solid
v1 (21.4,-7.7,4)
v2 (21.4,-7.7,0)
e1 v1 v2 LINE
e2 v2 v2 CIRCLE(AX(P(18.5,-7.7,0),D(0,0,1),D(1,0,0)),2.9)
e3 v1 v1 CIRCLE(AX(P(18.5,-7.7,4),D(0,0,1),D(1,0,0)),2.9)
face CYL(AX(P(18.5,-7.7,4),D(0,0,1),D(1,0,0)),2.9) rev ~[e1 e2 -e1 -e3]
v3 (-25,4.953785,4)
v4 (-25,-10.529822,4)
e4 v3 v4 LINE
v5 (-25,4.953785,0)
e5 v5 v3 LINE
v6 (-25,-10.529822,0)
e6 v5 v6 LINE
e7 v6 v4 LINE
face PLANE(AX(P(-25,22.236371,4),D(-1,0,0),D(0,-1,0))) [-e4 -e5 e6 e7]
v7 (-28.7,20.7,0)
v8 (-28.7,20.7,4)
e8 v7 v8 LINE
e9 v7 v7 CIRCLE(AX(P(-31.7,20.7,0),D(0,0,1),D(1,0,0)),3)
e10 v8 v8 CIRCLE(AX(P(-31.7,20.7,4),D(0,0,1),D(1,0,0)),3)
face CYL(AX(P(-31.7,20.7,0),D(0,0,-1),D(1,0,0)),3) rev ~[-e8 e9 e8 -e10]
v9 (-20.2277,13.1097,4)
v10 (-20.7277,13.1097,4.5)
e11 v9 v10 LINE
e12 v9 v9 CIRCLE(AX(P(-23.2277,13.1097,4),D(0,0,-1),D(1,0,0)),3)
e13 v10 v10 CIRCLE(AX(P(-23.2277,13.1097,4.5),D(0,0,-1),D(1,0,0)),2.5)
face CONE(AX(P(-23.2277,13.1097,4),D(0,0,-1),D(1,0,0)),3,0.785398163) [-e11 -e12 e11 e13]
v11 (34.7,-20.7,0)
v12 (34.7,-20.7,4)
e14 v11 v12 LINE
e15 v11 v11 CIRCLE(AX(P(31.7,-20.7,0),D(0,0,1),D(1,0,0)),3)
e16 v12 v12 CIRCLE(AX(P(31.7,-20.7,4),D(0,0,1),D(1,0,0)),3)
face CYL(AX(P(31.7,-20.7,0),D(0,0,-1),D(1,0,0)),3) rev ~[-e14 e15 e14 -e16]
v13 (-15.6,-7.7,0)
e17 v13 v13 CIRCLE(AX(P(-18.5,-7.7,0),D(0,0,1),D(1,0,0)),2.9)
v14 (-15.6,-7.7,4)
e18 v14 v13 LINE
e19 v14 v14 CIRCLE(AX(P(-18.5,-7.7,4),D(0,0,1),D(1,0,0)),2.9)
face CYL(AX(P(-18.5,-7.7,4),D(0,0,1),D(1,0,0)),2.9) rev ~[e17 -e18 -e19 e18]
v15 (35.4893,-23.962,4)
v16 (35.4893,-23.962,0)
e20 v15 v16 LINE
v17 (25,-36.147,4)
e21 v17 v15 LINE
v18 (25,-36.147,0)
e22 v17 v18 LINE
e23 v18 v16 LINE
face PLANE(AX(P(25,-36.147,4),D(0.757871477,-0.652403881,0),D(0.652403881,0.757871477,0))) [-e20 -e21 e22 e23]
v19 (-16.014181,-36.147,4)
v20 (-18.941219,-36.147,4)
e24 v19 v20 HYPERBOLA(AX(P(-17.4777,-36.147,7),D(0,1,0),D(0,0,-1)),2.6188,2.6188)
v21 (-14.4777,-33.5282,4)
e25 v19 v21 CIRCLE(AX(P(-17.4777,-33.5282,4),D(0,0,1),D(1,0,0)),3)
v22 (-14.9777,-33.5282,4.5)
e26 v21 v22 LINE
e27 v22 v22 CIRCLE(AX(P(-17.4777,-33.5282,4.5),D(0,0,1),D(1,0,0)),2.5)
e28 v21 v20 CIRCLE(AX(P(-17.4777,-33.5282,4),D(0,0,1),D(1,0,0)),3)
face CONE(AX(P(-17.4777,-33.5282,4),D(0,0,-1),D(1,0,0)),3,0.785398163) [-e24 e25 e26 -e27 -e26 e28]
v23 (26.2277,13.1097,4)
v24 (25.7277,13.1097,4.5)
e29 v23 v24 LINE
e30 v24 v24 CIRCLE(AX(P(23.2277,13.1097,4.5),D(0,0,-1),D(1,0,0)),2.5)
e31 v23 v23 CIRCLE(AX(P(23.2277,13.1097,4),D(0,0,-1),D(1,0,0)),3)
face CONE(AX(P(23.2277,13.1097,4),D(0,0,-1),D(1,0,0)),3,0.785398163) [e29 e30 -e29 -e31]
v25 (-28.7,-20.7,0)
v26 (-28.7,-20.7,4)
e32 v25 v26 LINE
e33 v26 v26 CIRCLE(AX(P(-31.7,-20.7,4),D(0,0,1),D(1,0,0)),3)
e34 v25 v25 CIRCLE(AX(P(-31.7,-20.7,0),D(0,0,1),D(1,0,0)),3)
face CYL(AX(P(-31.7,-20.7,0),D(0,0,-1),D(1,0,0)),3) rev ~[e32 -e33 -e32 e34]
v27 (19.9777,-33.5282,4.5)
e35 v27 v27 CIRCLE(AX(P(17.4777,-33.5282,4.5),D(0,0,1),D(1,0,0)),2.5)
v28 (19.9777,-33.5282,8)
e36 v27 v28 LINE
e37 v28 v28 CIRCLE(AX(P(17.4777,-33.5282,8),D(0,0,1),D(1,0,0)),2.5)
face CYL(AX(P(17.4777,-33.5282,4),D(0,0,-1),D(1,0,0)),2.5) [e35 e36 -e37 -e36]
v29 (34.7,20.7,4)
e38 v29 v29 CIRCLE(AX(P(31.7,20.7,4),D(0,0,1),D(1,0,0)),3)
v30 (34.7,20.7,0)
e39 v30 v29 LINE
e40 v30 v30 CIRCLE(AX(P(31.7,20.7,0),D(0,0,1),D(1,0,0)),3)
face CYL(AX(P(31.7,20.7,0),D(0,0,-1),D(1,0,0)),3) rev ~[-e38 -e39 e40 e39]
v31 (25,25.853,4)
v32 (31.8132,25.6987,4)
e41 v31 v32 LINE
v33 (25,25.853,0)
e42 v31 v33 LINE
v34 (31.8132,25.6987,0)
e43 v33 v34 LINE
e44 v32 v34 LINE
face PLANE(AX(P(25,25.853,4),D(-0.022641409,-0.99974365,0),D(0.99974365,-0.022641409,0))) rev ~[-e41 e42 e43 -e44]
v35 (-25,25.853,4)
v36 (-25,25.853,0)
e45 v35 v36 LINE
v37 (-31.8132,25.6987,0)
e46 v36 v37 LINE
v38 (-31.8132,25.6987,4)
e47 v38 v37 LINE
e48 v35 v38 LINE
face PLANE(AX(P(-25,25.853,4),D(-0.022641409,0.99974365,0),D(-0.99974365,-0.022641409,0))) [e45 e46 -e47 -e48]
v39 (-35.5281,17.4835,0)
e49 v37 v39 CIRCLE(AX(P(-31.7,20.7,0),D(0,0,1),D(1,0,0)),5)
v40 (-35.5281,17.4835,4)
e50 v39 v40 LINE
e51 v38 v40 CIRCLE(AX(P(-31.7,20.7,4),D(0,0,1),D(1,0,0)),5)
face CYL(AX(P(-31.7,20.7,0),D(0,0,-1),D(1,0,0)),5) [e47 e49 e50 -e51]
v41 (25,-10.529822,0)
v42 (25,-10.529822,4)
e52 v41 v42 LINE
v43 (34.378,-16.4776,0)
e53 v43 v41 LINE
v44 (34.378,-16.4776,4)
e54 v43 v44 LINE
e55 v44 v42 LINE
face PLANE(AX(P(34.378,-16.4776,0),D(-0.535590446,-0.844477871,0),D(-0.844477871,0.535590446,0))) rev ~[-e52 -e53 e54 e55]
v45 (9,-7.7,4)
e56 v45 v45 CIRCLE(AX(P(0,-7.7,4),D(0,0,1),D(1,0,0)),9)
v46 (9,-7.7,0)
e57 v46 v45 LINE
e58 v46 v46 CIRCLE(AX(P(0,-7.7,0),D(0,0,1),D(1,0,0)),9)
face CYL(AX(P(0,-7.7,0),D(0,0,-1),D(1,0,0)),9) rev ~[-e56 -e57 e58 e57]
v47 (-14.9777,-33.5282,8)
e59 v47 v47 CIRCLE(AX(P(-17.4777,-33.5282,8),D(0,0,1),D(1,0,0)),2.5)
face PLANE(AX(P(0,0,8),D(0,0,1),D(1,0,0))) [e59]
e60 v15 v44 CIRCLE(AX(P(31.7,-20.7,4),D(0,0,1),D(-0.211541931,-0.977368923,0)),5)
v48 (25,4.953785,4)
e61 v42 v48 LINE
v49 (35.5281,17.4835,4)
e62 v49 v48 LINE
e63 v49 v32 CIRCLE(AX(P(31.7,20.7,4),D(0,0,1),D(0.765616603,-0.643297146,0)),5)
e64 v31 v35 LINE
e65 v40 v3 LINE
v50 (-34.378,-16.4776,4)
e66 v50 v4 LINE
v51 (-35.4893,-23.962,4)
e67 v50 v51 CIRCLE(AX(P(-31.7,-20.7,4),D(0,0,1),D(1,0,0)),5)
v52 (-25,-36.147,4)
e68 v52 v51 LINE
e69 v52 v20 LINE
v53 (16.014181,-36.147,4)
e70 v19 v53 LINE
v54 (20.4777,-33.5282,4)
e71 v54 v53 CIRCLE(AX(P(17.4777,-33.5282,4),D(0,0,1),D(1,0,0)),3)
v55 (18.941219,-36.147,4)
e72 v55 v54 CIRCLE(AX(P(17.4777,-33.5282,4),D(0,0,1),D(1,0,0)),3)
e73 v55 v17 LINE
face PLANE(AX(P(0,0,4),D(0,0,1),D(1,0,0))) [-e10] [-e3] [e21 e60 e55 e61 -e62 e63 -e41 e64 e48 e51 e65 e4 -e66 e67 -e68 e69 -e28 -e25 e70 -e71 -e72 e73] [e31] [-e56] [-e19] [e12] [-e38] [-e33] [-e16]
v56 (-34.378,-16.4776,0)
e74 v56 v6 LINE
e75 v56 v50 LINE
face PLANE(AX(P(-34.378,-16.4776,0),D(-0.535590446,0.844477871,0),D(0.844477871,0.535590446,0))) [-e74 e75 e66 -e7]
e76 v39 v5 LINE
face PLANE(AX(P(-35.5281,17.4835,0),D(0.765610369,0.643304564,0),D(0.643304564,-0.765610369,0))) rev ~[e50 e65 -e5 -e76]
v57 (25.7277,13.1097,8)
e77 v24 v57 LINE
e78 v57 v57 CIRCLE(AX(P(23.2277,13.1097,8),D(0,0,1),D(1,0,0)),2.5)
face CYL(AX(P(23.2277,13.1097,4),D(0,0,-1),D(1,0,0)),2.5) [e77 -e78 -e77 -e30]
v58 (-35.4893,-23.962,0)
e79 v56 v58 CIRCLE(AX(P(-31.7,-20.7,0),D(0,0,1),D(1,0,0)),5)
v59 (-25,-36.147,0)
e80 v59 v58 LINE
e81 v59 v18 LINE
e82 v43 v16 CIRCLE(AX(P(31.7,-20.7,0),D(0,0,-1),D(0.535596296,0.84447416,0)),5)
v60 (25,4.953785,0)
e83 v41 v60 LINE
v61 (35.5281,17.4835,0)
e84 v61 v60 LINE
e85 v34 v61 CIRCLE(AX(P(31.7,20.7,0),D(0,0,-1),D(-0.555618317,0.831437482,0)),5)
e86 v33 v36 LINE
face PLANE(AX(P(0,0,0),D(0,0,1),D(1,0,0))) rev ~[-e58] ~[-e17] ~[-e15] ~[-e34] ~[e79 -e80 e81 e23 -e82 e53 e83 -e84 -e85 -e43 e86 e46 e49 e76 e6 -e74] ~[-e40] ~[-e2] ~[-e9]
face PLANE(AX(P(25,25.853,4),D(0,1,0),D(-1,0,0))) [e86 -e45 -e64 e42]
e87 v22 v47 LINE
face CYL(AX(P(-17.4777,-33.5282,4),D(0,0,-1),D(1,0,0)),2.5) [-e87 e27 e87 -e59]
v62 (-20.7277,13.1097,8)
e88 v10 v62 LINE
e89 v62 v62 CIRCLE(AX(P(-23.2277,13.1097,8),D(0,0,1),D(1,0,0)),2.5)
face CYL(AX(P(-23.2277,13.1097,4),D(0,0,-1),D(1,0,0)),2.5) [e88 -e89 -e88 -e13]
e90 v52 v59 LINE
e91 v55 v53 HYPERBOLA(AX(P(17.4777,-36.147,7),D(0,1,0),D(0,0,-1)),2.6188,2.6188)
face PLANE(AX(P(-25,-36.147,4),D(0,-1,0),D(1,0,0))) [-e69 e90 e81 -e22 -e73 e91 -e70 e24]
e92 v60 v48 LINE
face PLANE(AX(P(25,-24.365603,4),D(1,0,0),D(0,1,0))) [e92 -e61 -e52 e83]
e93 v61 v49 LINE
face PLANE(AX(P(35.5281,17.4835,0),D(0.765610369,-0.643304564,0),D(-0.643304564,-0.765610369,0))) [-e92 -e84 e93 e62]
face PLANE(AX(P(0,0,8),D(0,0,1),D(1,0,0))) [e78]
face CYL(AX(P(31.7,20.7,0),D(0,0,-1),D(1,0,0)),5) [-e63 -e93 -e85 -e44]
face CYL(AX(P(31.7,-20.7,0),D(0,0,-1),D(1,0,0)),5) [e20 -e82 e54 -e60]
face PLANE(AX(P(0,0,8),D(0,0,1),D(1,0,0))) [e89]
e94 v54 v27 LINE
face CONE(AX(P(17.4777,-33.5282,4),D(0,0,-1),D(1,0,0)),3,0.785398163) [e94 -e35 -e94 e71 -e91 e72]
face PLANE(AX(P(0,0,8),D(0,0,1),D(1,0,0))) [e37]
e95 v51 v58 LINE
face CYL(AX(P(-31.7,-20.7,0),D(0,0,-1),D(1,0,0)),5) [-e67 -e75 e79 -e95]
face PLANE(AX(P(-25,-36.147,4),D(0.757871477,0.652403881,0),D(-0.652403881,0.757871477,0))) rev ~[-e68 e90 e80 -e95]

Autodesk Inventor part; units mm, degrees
sketch "Sketch1" plane through (0, 0, 0) normal (0, 0, 1) x (1, 0, 0)
  circle A0 centre (0, -7.7) radius 6 construction
  circle A1 centre (18.5, -7.7) radius 2.4 construction
  circle A2 centre (-18.5, -7.7) radius 2.4 construction
  circle A3 centre (0, 12.9) radius 2 construction
  circle A4 centre (-31.7, -20.7) radius 2 construction
  circle A5 centre (31.7, -20.7) radius 2 construction
  circle A6 centre (31.7, 20.7) radius 2 construction
  circle A7 centre (-31.7, 20.7) radius 2 construction
  line L0 (-36.7, -25.7) -> (36.7, -25.7) construction
  line L1 (36.7, -25.7) -> (36.7, 25.7) construction
  line L2 (36.7, 25.7) -> (-36.7, 25.7) construction
  line L3 (-36.7, 25.7) -> (-36.7, -25.7) construction
  circle A8 centre (-31.7, 20.7) radius 3
  circle A9 centre (31.7, 20.7) radius 3
  circle A10 centre (31.7, -20.7) radius 3
  circle A11 centre (-31.7, -20.7) radius 3
  circle A12 centre (-31.7, 20.7) radius 5
  circle A13 centre (31.7, 20.7) radius 5
  circle A14 centre (31.7, -20.7) radius 5
  circle A15 centre (-31.7, -20.7) radius 5
  circle A16 centre (0, -7.7) radius 11
  line L4 (-30.6423, -25.5868) -> (2.3269, -18.4511)
  line L5 (-2.3269, -18.4511) -> (30.6423, -25.5868)
  line L6 (34.378, -16.4776) -> (5.8915, 1.5893)
  line L7 (-34.378, -16.4776) -> (-5.8915, 1.5893)
  line L8 (-28.9219, 24.8572) -> (6.1117, 1.4459)
  line L9 (-35.5281, 17.4835) -> (-8.4217, -14.7764)
  line L10 (-6.1117, 1.4459) -> (28.9219, 24.8572)
  line L11 (35.5281, 17.4835) -> (8.4217, -14.7764)
  circle A17 centre (0, -7.7) radius 9
  point P0 (0, 0)
  dimension "d0" = 1
  dimension "d1" = 2
  dimension "d2" = 5
  dimension "d3" = 3
extrude "Extrusion1" add sketch "Sketch1" along normal blind 4
ref_plane "Work Plane1" through (-29.8485, -37.5485, 6) normal (0, 0, 1) x (1, 0, 0)
ref_plane "Work Plane3" through (-29.8485, -37.5485, 8) normal (0, 0, 1) x (1, 0, 0)
sketch "Sketch2" plane through (0, 0, 4) normal (0, 0, 1) x (1, 0, 0)
  circle A0 centre (0, -7.7) radius 28.486 construction
  circle A1 centre (31.7, -20.7) radius 3 construction
  line L0 (0, -18.9547) -> (30.6423, -25.5868) construction
  arc A2 (30.6423, -25.5868) -> (34.378, -16.4776) centre (31.7, -20.7) ccw construction
  line L1 (34.378, -16.4776) -> (16.5128, -5.147) construction
  line L2 (16.5128, -5.147) -> (35.5281, 17.4835) construction
  arc A3 (35.5281, 17.4835) -> (28.9219, 24.8572) centre (31.7, 20.7) ccw construction
  line L3 (28.9219, 24.8572) -> (0, 5.53) construction
  line L4 (0, 5.53) -> (-28.9219, 24.8572) construction
  arc A4 (-28.9219, 24.8572) -> (-35.5281, 17.4835) centre (-31.7, 20.7) ccw construction
  line L5 (-35.5281, 17.4835) -> (-16.5128, -5.147) construction
  line L6 (-16.5128, -5.147) -> (-34.378, -16.4776) construction
  arc A5 (-34.378, -16.4776) -> (-30.6423, -25.5868) centre (-31.7, -20.7) ccw construction
  line L7 (-30.6423, -25.5868) -> (0, -18.9547) construction
  circle A6 centre (0, -7.7) radius 9 construction
  circle A7 centre (-31.7, -20.7) radius 3 construction
  circle A8 centre (-31.7, 20.7) radius 3 construction
  circle A9 centre (31.7, 20.7) radius 3 construction
  line L8 (0, -7.7) -> (31.7, 20.7) construction
  line L9 (0, -7.7) -> (-31.7, 20.7) construction
  circle A10 centre (23.2277, 13.1097) radius 2.7 construction
  circle A11 centre (-23.2277, 13.1097) radius 2.7 construction
  circle A12 centre (-23.2277, 13.1097) radius 2.5
  circle A13 centre (23.2277, 13.1097) radius 2.5
  point P0 (0, 0)
  dimension "d7" = 0.2
  dimension "d8" = 5
extrude "Extrusion2" add sketch "Sketch2" along normal up to surface (4 mm away)
sketch "Sketch5" plane through (0, 0, 4) normal (0, 0, 1) x (1, 0, 0)
  circle A0 centre (-23.2277, 13.1097) radius 2.5 construction
  circle A1 centre (23.2277, 13.1097) radius 2.5 construction
  circle A2 centre (31.7, -20.7) radius 3 construction
  line L0 (0, -18.9547) -> (30.6423, -25.5868) projected
  arc A3 (30.6423, -25.5868) -> (34.378, -16.4776) centre (31.7, -20.7) ccw projected
  line L1 (34.378, -16.4776) -> (16.5128, -5.147) construction
  line L2 (16.5128, -5.147) -> (35.5281, 17.4835) construction
  arc A4 (35.5281, 17.4835) -> (28.9219, 24.8572) centre (31.7, 20.7) ccw projected
  line L3 (28.9219, 24.8572) -> (0, 5.53) projected
  line L4 (0, 5.53) -> (-28.9219, 24.8572) projected
  arc A5 (-28.9219, 24.8572) -> (-35.5281, 17.4835) centre (-31.7, 20.7) ccw projected
  line L5 (-35.5281, 17.4835) -> (-16.5128, -5.147) construction
  line L6 (-16.5128, -5.147) -> (-34.378, -16.4776) construction
  arc A6 (-34.378, -16.4776) -> (-30.6423, -25.5868) centre (-31.7, -20.7) ccw projected
  line L7 (-30.6423, -25.5868) -> (0, -18.9547) projected
  circle A7 centre (0, -7.7) radius 9 construction
  circle A8 centre (-31.7, -20.7) radius 3 construction
  circle A9 centre (-31.7, 20.7) radius 3 construction
  circle A10 centre (31.7, 20.7) radius 3 construction
  line L8 (16.5128, -5.147) -> (-16.5128, -5.147) construction
  line L9 (0, -18.9547) -> (0, 5.53) construction
  line L10 (-25, 25.853) -> (-25, -36.147)
  line L11 (-25, -36.147) -> (25, -36.147)
  line L12 (25, -36.147) -> (25, 25.853)
  line L13 (25, 25.853) -> (-25, 25.853)
  line L14 (-25, 25.853) -> (25, -36.147) construction
  line L15 (-25, -36.147) -> (25, 25.853) construction
  circle A11 centre (0, -7.7) radius 9
  circle A12 centre (0, -7.7) radius 9 projected
  line L16 (-25, -36.147) -> (-35.4893, -23.962)
  arc A13 (-34.378, -16.4776) -> (-30.6423, -25.5868) centre (-31.7, -20.7) ccw projected
  line L17 (25, -36.147) -> (35.4893, -23.962)
  arc A14 (30.6423, -25.5868) -> (34.378, -16.4776) centre (31.7, -20.7) ccw projected
  line L18 (-25, 25.853) -> (-31.8132, 25.6987)
  arc A15 (-28.9219, 24.8572) -> (-35.5281, 17.4835) centre (-31.7, 20.7) ccw projected
  line L19 (25, 25.853) -> (31.8132, 25.6987)
  arc A16 (35.5281, 17.4835) -> (28.9219, 24.8572) centre (31.7, 20.7) ccw projected
  point P0 (0, 0)
  point P1 (0, -5.147)
  dimension "d17" = 62
  dimension "d18" = 50
extrude "Extrusion5" add sketch "Sketch5" against normal up to surface (4 mm away)
sketch "Sketch4" plane through (0, 0, 4) normal (0, 0, 1) x (1, 0, 0)
  circle A0 centre (-18.5, -7.7) radius 2.4 construction
  circle A1 centre (18.5, -7.7) radius 2.4 construction
  circle A2 centre (18.5, -7.7) radius 2.9
  circle A3 centre (-18.5, -7.7) radius 2.9
  point P0 (0, 0)
  dimension "d14" = 0.5
extrude "Extrusion4" cut sketch "Sketch4" against normal up to surface (4 mm away)
sketch "Sketch6" plane through (0, 0, 4) normal (0, 0, 1) x (1, 0, 0)
  circle A0 centre (18.5, -7.7) radius 2.9 construction
  circle A1 centre (-18.5, -7.7) radius 2.9 construction
  circle A2 centre (-31.7, -20.7) radius 3 construction
  circle A3 centre (-31.7, 20.7) radius 3 construction
  circle A4 centre (0, -7.7) radius 9 construction
  circle A5 centre (31.7, 20.7) radius 3 construction
  arc A6 (35.4893, -23.962) -> (34.378, -16.4776) centre (31.7, -20.7) ccw construction
  line L0 (34.378, -16.4776) -> (25, -10.5299) construction
  line L1 (25, -10.5299) -> (25, 4.9538) construction
  line L2 (25, 4.9538) -> (35.5281, 17.4835) construction
  arc A7 (35.5281, 17.4835) -> (31.8132, 25.6987) centre (31.7, 20.7) ccw construction
  line L3 (25, 25.853) -> (-25, 25.853) construction
  arc A8 (-31.8132, 25.6987) -> (-35.5281, 17.4835) centre (-31.7, 20.7) ccw construction
  line L4 (-35.5281, 17.4835) -> (-25, 4.9538) construction
  line L5 (-25, 4.9538) -> (-25, -10.5299) construction
  line L6 (-25, -10.5299) -> (-34.378, -16.4776) construction
  arc A9 (-34.378, -16.4776) -> (-35.4893, -23.962) centre (-31.7, -20.7) ccw construction
  line L7 (-25, -36.147) -> (25, -36.147) construction
  circle A10 centre (31.7, -20.7) radius 3 construction
  line L8 (0, -7.7) -> (31.7, -20.7) construction
  line L9 (0, -7.7) -> (-31.7, -20.7) construction
  circle A11 centre (23.2277, 13.1097) radius 2.5 projected
  line L10 (31.8132, 25.6987) -> (25, 25.853) projected
  line L11 (-25, 25.853) -> (-31.8132, 25.6987) projected
  line L12 (-35.4893, -23.962) -> (-25, -36.147) projected
  line L13 (25, -36.147) -> (35.4893, -23.962) projected
  circle A12 centre (23.2277, 13.1097) radius 2.5 projected
  circle A13 centre (-23.2277, 13.1097) radius 2.5 projected
  circle A14 centre (17.4777, -33.5282) radius 2.5
  circle A15 centre (0, -7.7) radius 31.186 construction
  circle A16 centre (-17.4777, -33.5282) radius 2.5
  circle A17 centre (-23.2277, 13.1097) radius 2.5 projected
  arc A18 (19.1487, 13.5246) -> (-19.1487, 13.5246) centre (0, -7.7) ccw projected
  arc A19 (-19.2697, 12.04) -> (-19.1487, 13.5246) centre (-23.2277, 13.1097) ccw projected
  arc A20 (19.2697, 12.04) -> (-19.2697, 12.04) centre (0, -7.7) ccw projected
  arc A21 (19.1487, 13.5246) -> (19.2697, 12.04) centre (23.2277, 13.1097) ccw projected
  point P0 (0, 0)
  point P1 (23.7277, 10.2129)
  point P2 (20.4031, 13.9239)
  dimension "d25" = 5.75
  dimension "d26" = 0
ref_plane "Work Plane2" through (-27.235, -34.935, 21) normal (0, 0, 1) x (1, 0, 0)
extrude "Extrusion6" add sketch "Sketch6" along normal up to surface (4 mm away) contours A14 | A16
chamfer "Chamfer1" distance 0.5 angle 45 4 edges at (-25.7277, 13.1097, 4) (20.7277, 13.1097, 4) (14.9777, -33.5282, 4) (-19.9777, -33.5282, 4)
properties part number "adpaterPlate"
